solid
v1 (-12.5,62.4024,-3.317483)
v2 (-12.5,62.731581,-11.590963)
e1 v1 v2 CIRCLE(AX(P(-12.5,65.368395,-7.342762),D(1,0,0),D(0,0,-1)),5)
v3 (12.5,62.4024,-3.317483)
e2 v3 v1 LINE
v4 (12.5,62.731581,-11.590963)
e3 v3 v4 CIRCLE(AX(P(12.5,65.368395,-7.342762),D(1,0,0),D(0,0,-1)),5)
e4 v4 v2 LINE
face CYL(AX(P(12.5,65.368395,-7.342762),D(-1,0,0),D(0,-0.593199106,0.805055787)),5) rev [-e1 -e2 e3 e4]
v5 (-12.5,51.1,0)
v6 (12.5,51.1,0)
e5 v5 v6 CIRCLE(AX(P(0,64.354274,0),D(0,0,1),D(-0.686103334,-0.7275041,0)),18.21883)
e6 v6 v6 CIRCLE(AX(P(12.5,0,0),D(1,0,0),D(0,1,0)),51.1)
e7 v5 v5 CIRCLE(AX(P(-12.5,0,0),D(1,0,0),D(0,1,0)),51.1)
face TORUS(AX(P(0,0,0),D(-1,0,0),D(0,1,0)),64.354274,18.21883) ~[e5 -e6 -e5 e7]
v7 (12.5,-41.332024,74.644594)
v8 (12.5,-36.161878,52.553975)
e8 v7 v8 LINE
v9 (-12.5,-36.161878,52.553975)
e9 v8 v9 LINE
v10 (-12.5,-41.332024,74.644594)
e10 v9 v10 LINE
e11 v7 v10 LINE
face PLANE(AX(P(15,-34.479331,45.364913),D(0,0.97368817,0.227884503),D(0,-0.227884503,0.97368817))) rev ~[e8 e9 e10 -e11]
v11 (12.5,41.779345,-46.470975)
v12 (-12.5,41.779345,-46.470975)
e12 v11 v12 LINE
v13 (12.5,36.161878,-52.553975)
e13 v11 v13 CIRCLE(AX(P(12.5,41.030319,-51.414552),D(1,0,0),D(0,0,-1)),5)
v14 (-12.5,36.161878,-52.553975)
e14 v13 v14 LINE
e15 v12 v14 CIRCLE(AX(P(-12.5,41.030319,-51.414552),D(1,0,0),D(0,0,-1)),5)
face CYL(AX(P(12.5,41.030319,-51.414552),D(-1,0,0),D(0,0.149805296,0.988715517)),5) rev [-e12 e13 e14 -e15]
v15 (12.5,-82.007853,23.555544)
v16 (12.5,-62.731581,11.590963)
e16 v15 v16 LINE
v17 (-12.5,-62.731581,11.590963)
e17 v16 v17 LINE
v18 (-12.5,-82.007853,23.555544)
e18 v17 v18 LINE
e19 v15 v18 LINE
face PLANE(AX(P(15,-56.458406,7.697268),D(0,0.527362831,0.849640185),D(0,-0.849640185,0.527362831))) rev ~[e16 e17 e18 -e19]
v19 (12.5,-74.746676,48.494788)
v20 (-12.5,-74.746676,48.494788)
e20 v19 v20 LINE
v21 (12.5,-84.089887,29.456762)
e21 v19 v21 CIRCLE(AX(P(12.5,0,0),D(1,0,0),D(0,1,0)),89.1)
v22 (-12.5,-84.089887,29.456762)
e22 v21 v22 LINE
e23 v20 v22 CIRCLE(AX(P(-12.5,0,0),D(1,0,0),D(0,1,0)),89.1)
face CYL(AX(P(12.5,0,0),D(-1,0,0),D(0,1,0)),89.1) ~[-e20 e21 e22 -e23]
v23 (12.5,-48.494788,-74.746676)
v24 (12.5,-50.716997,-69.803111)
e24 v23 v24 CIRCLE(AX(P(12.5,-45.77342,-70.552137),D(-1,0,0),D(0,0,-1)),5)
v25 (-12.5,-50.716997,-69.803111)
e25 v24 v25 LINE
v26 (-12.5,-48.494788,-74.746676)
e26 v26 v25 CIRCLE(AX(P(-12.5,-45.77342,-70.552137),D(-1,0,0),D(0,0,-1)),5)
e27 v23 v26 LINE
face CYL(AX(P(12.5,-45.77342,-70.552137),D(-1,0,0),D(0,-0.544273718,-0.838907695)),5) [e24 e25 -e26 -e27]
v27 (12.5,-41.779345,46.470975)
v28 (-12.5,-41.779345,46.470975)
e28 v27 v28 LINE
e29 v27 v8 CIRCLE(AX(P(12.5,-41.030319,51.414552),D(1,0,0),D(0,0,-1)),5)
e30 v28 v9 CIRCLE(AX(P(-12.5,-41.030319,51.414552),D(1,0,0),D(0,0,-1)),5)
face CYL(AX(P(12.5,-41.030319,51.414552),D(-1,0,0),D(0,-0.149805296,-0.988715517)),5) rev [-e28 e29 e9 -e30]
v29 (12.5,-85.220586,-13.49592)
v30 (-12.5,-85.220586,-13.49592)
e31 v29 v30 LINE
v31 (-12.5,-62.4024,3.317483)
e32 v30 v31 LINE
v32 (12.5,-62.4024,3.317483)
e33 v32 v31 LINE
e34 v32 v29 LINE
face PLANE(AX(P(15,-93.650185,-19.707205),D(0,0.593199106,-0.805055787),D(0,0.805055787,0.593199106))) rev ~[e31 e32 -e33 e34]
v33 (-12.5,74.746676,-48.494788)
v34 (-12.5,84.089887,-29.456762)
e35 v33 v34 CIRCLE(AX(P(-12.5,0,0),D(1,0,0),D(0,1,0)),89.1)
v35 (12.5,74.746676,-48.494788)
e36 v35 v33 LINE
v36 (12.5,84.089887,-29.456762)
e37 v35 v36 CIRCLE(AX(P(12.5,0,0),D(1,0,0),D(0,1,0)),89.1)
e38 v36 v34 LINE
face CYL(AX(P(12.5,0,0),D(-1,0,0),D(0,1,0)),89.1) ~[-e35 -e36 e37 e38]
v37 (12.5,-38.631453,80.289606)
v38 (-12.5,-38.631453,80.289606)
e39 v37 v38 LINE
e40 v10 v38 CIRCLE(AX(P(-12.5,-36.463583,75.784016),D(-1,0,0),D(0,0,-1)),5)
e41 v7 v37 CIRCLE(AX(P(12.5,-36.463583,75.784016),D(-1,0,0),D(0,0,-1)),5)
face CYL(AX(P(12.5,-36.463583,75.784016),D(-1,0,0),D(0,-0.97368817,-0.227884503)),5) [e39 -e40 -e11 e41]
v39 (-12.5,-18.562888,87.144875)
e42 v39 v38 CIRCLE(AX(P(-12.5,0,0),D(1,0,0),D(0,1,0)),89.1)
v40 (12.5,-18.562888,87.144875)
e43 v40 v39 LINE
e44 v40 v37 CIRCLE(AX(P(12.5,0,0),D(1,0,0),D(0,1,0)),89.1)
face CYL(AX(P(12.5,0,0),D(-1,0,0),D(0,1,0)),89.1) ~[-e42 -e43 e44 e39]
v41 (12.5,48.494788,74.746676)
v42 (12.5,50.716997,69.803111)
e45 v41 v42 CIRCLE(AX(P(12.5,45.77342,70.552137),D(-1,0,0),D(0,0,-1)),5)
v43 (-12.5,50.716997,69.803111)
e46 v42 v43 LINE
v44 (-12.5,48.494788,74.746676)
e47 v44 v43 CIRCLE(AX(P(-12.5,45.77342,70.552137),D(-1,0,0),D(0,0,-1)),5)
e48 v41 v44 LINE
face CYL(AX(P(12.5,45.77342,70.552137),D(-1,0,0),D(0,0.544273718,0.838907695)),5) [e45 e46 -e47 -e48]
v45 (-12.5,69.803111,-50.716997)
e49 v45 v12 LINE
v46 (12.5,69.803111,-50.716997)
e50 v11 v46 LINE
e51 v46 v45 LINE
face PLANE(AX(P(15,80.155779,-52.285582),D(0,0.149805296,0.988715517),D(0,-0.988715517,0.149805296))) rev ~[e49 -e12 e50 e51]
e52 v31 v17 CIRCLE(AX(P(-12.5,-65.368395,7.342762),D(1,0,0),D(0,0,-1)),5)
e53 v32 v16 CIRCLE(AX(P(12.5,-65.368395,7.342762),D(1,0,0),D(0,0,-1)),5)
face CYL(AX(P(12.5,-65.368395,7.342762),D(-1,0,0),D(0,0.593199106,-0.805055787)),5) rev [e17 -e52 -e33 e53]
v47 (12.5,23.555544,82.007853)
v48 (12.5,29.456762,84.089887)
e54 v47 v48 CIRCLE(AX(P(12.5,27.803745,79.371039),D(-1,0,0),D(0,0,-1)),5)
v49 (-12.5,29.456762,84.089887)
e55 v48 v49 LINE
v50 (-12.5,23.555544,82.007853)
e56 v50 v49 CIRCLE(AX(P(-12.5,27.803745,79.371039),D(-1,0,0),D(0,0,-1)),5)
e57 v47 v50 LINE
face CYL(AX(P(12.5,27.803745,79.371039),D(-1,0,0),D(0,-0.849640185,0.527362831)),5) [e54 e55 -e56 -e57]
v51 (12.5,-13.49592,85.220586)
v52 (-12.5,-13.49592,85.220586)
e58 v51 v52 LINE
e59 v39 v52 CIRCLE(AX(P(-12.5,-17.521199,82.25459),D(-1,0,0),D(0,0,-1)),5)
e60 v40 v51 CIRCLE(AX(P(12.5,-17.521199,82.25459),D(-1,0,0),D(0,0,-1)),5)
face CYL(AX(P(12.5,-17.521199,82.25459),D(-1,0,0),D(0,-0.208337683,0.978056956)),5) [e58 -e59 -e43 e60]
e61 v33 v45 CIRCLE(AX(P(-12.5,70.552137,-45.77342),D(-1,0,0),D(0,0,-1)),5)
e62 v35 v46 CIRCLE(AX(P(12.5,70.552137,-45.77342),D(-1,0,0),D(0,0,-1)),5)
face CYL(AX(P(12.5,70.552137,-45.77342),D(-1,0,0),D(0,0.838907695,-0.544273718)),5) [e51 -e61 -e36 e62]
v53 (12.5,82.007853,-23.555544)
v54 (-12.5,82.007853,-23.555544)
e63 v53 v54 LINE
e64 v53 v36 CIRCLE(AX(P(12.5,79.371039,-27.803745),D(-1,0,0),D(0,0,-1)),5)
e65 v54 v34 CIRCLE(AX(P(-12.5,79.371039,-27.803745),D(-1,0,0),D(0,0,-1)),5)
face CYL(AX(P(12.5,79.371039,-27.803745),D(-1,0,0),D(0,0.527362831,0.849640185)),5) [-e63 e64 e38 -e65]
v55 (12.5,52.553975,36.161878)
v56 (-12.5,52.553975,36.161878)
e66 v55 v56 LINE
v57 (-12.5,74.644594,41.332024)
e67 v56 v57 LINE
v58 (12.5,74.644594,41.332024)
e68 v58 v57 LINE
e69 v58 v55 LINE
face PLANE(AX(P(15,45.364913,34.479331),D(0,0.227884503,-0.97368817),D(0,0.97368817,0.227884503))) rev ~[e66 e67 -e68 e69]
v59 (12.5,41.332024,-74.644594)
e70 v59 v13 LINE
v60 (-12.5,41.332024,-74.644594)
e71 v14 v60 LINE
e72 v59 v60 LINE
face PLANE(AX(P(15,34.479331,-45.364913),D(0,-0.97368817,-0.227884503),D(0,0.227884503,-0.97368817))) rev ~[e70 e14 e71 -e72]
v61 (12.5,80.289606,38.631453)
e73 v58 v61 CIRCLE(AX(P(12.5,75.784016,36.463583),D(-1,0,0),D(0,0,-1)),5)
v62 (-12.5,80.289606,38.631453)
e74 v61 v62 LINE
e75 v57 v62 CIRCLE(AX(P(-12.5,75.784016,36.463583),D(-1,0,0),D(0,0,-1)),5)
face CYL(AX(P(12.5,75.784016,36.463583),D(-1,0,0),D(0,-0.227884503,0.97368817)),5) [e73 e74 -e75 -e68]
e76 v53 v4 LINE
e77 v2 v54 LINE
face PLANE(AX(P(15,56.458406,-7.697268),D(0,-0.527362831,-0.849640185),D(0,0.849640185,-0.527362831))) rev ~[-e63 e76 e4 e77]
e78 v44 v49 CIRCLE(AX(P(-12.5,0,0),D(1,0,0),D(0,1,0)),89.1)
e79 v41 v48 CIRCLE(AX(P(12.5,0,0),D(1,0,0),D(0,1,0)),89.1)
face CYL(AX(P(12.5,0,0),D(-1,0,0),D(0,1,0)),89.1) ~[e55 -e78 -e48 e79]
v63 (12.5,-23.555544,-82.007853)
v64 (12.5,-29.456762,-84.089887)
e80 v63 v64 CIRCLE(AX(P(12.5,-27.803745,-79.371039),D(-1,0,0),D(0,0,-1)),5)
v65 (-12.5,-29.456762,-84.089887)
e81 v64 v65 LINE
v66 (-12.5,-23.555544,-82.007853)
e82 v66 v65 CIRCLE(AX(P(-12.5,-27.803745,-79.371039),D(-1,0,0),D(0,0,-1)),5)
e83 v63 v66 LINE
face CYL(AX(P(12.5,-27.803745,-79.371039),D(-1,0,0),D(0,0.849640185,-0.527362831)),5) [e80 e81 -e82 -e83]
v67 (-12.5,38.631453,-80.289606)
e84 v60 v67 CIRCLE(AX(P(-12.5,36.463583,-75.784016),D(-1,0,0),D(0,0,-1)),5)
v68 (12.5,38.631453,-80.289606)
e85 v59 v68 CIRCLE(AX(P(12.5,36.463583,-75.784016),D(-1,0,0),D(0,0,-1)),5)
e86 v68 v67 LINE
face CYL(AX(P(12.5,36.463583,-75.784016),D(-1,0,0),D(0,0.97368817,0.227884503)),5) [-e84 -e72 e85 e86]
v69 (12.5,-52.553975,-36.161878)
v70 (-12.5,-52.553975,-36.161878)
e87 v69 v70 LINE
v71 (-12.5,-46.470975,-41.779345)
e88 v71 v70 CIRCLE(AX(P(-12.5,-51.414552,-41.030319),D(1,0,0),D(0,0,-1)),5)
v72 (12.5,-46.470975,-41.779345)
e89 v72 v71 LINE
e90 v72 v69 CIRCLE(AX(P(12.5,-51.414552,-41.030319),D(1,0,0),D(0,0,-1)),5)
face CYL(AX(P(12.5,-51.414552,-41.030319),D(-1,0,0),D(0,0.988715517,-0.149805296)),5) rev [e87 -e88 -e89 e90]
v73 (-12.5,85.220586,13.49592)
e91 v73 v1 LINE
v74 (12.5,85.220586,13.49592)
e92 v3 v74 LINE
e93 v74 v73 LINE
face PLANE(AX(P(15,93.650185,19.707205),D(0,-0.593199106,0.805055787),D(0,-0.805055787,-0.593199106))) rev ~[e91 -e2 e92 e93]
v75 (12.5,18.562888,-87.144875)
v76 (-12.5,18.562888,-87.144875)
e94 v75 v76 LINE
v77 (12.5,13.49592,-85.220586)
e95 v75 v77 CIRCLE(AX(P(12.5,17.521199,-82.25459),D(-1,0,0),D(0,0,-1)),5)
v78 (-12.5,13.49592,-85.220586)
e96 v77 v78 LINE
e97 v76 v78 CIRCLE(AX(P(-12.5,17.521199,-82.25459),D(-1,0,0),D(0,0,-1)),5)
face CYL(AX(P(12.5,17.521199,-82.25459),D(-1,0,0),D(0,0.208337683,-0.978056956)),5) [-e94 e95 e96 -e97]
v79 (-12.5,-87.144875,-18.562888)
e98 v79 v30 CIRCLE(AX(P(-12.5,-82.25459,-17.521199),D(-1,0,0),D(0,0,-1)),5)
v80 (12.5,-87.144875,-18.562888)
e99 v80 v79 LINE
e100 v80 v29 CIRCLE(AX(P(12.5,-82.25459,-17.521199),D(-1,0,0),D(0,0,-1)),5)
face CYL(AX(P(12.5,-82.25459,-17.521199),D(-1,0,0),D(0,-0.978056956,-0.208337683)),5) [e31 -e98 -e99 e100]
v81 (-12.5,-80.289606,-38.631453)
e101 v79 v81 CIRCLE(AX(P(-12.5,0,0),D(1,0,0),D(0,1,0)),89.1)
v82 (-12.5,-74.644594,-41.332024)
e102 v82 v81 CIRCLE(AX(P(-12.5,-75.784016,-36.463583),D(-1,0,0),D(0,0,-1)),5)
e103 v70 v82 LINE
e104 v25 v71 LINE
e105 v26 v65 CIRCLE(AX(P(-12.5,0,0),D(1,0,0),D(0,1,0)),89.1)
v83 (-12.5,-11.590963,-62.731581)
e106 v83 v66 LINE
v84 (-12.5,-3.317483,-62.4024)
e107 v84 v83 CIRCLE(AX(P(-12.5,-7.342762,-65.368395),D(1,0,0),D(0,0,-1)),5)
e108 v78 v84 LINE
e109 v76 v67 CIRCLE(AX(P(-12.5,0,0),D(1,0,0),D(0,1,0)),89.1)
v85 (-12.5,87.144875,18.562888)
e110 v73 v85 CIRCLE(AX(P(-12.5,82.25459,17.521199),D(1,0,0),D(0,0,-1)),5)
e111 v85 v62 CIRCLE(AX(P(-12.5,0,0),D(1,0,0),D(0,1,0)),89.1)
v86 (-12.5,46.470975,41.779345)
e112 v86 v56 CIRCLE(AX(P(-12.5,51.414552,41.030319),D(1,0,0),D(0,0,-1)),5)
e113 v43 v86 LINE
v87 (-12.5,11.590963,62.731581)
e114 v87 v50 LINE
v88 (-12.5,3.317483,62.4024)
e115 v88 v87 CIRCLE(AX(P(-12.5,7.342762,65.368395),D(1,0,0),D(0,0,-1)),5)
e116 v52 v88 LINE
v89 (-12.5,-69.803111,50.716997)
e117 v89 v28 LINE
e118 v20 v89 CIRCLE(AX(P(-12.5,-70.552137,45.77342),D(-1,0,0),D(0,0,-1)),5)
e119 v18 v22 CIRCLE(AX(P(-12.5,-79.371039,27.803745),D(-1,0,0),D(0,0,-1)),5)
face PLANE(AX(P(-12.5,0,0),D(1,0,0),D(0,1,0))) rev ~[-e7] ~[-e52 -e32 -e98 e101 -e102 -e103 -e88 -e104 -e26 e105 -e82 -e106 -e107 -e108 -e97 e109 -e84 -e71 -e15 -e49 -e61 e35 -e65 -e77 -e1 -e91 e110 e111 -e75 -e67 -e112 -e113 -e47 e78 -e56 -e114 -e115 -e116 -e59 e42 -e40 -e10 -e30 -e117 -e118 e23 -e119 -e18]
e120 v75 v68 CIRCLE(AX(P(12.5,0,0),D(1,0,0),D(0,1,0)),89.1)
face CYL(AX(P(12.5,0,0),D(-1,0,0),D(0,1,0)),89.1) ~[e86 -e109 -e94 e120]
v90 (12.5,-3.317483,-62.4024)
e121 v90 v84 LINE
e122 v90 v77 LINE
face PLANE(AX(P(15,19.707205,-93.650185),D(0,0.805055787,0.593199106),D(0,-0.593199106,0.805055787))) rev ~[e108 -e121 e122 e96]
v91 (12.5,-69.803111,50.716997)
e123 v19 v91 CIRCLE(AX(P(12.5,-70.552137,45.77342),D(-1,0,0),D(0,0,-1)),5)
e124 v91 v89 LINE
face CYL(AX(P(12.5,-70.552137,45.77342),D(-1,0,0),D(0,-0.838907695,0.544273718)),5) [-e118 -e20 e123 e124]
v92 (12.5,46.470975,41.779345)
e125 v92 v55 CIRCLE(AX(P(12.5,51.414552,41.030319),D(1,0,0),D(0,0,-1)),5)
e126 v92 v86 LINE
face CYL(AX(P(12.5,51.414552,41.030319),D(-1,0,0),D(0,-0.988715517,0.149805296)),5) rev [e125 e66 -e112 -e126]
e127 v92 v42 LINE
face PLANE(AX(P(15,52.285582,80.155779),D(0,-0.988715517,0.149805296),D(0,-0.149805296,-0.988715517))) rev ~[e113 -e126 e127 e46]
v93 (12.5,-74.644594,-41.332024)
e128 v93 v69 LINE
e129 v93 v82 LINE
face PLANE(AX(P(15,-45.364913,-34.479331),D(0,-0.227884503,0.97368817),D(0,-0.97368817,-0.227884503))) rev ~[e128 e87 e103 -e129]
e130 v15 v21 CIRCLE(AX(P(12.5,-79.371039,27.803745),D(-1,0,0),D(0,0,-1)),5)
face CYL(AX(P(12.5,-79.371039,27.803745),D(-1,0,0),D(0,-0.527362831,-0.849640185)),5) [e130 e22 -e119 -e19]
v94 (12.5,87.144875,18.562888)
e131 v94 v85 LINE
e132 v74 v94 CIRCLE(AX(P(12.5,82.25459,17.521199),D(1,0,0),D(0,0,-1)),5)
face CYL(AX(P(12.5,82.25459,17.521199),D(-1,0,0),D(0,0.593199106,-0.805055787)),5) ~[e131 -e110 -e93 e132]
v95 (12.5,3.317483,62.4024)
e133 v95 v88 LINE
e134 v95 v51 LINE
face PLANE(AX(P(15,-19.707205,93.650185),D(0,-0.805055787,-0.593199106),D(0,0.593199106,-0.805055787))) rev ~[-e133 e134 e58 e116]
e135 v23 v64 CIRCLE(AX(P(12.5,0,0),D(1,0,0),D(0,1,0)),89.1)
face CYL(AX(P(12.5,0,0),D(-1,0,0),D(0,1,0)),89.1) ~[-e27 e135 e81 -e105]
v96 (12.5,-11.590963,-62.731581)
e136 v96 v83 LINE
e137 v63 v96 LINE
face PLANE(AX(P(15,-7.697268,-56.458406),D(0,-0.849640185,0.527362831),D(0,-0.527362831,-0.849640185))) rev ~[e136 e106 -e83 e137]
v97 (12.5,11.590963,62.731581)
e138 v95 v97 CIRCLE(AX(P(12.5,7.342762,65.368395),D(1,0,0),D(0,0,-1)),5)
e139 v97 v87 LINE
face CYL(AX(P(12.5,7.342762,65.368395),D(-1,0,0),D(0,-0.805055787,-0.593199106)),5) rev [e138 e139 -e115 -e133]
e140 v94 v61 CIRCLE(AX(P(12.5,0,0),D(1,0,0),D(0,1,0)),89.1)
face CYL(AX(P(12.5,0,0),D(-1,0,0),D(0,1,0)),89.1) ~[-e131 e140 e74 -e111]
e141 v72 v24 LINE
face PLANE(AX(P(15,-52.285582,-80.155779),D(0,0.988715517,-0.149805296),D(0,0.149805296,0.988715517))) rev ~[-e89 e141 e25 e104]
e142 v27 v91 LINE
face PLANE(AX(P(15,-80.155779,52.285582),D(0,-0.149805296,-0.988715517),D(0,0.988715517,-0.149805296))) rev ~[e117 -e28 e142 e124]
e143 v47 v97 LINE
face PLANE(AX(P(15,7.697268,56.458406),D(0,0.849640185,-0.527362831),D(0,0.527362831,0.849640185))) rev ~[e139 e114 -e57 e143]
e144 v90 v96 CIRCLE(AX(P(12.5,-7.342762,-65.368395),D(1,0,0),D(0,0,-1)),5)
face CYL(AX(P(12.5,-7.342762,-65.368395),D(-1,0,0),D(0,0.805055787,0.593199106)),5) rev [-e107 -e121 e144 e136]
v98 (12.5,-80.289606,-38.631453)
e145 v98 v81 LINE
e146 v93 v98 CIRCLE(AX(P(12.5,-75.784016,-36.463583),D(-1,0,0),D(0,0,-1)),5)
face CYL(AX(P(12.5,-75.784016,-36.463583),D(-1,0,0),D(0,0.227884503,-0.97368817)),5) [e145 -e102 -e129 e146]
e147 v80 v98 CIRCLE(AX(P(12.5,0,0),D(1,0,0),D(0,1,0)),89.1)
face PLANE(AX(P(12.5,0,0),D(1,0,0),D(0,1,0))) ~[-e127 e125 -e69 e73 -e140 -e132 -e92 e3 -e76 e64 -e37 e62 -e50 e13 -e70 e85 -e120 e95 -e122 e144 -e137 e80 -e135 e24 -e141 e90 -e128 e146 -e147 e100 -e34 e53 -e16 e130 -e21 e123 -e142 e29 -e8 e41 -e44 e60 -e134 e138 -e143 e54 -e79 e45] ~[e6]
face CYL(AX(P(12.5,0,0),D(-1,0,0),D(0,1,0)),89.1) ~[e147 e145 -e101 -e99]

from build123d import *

# Parameters (mm, degrees)
F4_DEPTH = 60
F5_R     = 5


# Not quite as in the source:
# - a feature names something its author has since deleted; it is built from what else it names


with BuildPart() as f1:
    # F0 (on Top) → F1 (revolve)
    with BuildSketch(Plane.XY):
        with BuildLine():
            Line((-12.5, 89.1), (-12.5, 51.1))
            ThreePointArc((-12.5, 51.1), (0, 46.135443521), (12.5, 51.1))
            Line((12.5, 51.1), (12.5, 89.1))
            Line((12.5, 89.1), (-12.5, 89.1))
        make_face()
    revolve(axis=Axis((4.8881422824, 0, 0), (1, 0, 0)))

    # F3 (on offset) → F4 (cut)
    with BuildSketch(Plane.YZ.offset(15)):
        Polygon((43.1796096184, -82.538823422), (80.155778704, -52.2855824361), (34.4793311693, -45.3649125185), align=None)
        Polygon((-27.8311669827, -88.896356523), (19.707204774, -93.6501845717), (-7.6972683892, -56.4584061503), align=None)
        Polygon((-82.538823422, -43.1796096184), (-52.2855824361, -80.155778704), (-45.3649125185, -34.4793311693), align=None)
        Polygon((-56.4584061503, 7.6972683892), (-88.896356523, 27.8311669827), (-93.6501845717, -19.707204774), align=None)
        Polygon((-43.1796096184, 82.538823422), (-80.155778704, 52.2855824361), (-34.4793311693, 45.3649125185), align=None)
        Polygon((27.8311669827, 88.896356523), (-19.707204774, 93.6501845717), (7.6972683892, 56.4584061503), align=None)
        Polygon((82.538823422, 43.1796096184), (52.2855824361, 80.155778704), (45.3649125185, 34.4793311693), align=None)
        Polygon((88.896356523, -27.8311669827), (93.6501845717, 19.707204774), (56.4584061503, -7.6972683892), align=None)
    extrude(amount=-F4_DEPTH, mode=Mode.SUBTRACT)

    # F5
    f5_edges = [f1.edges().sort_by_distance(p)[0] for p in [
        (0, 87.764267, 15.370212),
        (0, 85.336625, -25.621679),
        (0, 72.92709, -51.190327),
        (0, 78.459369, 42.224844),
        (0, 51.190327, 72.92709),
        (0, 42.224844, -78.459369),
        (0, 15.370212, -87.764267),
        (0, 34.479331, -45.364913),
        (0, 56.458406, -7.697268),
        (0, 45.364913, 34.479331),
        (0, 25.621679, 85.336625),
        (0, 7.697268, 56.458406),
        (0, -15.370212, 87.764267),
        (0, -42.224844, 78.459369),
        (0, -34.479331, 45.364913),
        (0, -72.92709, 51.190327),
        (0, -85.336625, 25.621679),
        (0, -56.458406, 7.697268),
        (0, -87.764267, -15.370212),
        (0, -78.459369, -42.224844),
        (0, -45.364913, -34.479331),
        (0, -51.190327, -72.92709),
        (0, -25.621679, -85.336625),
        (0, -7.697268, -56.458406),
    ]]
    fillet(f5_edges, radius=F5_R)


solid = f1.part
